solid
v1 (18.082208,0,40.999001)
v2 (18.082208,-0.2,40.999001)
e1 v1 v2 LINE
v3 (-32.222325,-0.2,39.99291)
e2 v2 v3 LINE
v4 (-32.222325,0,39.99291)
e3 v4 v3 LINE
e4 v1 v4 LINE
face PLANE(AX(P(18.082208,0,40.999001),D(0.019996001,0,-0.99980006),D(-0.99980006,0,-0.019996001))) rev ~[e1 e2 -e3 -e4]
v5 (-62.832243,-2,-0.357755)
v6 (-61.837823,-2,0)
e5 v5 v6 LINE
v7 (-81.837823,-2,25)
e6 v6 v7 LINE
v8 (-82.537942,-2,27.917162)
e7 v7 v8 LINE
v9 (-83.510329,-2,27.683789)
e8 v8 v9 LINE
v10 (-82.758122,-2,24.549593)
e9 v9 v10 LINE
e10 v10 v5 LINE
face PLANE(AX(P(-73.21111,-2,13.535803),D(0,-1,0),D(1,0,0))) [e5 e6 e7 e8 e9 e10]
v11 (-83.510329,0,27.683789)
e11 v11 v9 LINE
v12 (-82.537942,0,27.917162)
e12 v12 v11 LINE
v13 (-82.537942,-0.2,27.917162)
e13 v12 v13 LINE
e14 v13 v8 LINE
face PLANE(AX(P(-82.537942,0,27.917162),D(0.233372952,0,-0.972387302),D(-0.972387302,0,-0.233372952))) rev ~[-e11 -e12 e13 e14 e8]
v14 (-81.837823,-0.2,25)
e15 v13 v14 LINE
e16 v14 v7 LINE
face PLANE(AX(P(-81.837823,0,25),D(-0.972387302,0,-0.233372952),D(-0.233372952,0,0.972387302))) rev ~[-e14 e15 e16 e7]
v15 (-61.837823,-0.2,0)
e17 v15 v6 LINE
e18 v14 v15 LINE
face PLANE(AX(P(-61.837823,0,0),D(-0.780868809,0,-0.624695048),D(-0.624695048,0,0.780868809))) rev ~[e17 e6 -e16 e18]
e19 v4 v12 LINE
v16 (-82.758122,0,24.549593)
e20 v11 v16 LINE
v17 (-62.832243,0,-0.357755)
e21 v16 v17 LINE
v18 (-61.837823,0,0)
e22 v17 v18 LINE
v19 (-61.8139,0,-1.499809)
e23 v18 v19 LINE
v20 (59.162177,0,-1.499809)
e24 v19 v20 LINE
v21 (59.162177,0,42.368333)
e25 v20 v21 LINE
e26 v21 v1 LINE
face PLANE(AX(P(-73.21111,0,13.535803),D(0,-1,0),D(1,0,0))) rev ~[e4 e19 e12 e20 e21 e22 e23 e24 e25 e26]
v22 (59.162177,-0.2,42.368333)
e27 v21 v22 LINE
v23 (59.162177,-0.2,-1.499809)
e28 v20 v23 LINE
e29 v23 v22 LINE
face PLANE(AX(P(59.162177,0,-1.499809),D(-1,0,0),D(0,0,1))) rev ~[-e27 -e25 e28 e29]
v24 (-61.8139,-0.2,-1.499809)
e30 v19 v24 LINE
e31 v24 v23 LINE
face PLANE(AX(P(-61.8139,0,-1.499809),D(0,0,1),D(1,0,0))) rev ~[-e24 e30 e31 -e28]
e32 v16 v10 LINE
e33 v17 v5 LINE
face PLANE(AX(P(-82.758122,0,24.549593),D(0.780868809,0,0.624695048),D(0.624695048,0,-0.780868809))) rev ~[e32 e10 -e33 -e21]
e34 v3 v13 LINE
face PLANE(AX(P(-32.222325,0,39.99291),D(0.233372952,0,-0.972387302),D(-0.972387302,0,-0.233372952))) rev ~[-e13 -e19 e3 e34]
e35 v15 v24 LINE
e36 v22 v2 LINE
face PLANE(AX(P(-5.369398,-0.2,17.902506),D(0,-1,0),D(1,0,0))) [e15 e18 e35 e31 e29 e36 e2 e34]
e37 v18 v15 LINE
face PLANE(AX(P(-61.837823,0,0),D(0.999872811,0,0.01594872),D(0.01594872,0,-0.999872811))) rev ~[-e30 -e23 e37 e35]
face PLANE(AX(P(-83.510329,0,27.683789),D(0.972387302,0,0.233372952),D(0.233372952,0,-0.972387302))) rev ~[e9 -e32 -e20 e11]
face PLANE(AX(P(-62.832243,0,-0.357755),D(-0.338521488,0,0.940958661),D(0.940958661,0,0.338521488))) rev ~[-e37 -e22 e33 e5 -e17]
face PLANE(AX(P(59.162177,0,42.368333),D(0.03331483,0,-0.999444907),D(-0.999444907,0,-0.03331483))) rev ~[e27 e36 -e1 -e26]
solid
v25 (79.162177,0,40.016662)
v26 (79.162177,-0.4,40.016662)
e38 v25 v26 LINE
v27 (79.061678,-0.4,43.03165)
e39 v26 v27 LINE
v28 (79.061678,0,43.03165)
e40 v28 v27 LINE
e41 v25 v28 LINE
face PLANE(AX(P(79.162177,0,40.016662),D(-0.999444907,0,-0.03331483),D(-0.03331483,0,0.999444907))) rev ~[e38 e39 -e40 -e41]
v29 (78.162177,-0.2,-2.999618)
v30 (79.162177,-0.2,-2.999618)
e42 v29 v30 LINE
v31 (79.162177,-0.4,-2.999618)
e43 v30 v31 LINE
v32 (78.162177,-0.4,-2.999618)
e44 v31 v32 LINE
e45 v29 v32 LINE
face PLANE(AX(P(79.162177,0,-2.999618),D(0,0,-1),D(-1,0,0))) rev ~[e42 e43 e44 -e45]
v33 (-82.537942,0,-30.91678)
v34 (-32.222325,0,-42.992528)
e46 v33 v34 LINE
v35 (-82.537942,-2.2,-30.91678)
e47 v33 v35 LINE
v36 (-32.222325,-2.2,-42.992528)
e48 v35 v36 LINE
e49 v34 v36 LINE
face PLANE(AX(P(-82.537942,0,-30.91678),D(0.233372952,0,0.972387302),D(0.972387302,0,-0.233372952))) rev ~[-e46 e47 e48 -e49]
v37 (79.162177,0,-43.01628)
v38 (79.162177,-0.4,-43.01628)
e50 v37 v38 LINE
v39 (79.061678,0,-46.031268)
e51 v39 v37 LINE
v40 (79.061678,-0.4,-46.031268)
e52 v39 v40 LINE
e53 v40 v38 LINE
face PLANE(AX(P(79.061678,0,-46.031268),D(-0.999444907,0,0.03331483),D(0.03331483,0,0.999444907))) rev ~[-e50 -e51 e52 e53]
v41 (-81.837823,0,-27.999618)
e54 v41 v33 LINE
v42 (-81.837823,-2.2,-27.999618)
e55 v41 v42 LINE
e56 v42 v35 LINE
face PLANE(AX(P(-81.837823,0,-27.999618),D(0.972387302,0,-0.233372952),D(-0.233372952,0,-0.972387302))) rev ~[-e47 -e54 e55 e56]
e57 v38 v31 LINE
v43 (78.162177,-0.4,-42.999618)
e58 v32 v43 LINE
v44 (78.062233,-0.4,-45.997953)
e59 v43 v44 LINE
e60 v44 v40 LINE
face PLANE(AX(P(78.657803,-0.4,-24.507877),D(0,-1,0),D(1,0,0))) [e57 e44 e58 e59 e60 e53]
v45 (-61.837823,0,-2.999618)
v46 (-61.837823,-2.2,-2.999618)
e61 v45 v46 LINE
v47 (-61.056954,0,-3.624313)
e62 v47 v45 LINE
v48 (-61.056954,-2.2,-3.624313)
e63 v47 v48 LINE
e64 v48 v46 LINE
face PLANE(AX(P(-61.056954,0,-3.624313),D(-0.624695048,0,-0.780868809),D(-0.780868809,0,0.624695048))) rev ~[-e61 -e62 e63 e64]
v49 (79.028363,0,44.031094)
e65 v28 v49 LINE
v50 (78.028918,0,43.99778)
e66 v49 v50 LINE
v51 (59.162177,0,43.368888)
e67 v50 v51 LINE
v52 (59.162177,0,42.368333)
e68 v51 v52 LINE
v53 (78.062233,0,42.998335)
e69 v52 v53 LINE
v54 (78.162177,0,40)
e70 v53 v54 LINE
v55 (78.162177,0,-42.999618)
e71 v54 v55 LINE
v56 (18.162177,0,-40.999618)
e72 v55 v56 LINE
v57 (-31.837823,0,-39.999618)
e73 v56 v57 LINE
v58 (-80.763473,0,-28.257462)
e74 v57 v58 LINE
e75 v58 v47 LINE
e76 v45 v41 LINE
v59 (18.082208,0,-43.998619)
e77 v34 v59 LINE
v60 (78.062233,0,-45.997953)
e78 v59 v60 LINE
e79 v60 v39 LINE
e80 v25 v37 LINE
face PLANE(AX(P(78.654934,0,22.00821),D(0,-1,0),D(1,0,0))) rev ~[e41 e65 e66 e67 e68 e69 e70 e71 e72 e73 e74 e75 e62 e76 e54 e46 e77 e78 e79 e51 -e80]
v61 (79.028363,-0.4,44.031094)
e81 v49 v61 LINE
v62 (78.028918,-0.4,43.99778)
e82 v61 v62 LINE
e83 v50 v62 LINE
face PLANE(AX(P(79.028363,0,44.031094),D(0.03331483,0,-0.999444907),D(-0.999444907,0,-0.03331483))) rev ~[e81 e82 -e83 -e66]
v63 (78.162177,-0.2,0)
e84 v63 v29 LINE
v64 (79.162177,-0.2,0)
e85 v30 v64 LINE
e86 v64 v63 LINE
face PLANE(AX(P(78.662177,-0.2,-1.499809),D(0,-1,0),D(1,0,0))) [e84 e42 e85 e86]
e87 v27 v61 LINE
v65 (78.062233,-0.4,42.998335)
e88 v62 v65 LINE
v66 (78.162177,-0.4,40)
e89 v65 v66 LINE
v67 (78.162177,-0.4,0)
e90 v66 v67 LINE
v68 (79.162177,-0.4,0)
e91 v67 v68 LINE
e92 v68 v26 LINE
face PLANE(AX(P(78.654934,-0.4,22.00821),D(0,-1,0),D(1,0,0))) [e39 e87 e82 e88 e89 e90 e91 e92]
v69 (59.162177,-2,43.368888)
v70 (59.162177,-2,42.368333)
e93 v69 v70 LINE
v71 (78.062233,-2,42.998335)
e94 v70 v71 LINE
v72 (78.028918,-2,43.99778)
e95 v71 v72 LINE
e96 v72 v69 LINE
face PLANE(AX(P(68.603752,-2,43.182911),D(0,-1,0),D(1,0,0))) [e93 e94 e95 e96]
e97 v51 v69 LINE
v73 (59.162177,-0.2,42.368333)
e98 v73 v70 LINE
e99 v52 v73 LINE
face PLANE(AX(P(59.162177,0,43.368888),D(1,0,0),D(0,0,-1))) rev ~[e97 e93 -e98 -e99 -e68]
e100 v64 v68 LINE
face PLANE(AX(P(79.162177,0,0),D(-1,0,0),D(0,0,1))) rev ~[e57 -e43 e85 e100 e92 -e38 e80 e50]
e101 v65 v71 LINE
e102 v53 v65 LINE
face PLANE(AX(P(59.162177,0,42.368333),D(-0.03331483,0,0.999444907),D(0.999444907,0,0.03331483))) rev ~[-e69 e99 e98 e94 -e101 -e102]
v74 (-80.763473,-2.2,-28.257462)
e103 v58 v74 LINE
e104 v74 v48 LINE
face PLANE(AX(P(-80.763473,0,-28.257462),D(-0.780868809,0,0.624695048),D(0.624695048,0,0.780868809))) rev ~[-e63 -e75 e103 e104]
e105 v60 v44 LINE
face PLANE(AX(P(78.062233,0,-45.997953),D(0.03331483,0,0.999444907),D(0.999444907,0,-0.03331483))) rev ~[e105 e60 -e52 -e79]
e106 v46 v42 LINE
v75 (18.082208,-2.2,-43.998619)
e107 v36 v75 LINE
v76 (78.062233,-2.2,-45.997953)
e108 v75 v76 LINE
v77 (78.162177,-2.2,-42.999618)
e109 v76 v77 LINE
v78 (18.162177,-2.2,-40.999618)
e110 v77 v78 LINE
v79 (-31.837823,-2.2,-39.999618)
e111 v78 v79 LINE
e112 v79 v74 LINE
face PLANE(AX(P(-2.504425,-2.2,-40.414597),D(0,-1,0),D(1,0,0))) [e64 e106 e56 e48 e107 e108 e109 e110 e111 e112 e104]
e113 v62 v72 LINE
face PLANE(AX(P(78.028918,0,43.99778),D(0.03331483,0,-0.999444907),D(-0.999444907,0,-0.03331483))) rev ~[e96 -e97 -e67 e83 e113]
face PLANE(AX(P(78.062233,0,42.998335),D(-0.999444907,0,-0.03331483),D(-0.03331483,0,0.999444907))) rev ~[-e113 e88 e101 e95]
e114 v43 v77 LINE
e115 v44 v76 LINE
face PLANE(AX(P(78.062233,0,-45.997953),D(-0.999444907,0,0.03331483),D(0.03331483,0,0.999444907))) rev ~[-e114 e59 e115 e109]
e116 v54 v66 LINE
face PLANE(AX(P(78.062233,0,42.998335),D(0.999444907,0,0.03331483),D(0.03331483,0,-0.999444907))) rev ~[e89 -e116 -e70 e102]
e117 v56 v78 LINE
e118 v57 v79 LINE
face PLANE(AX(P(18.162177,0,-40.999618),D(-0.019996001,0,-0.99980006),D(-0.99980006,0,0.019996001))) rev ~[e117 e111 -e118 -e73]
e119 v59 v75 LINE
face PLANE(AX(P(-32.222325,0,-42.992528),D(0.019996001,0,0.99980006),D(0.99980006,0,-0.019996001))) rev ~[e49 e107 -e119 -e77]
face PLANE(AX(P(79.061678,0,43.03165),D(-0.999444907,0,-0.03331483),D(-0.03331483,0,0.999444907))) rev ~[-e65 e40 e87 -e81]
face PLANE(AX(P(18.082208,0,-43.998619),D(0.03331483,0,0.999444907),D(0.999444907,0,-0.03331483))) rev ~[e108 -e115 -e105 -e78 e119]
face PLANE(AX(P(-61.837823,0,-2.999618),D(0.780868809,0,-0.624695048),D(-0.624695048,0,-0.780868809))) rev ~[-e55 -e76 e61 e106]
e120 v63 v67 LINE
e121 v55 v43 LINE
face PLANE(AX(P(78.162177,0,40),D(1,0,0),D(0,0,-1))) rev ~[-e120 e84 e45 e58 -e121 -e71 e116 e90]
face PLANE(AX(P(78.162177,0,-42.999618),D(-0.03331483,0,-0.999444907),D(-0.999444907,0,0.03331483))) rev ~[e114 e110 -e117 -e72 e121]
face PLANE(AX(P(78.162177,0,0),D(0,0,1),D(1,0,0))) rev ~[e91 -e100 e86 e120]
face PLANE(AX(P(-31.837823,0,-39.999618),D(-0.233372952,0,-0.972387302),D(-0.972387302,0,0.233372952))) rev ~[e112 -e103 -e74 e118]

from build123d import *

# Parameters (mm, degrees)
F1_DEPTH = 0.2
F2_DEPTH = 2
F3_DEPTH = 2.2
F6_DEPTH = 0.4


# Not quite as in the source:
# - a feature of the source that left no trace in its solid (it failed there, or was rolled back) is left out
# - a feature names something its author has since deleted; it is built from what else it names


with BuildPart() as f1:
    # F0 (on Front) → F1 (new body)
    with BuildSketch(Plane.XZ):
        Polygon((-31.8378226987, 37), (-81.8378226987, 25), (-61.8378226987, 0), (-61.813899618, -1.4998092166), (59.1621773013, -1.4998092166), (59.1621773013, 39.3666666667), (18.1621773013, 38), align=None)
        Polygon((-82.5379415561, 27.9171619059), (-81.8378226987, 25), (-31.8378226987, 37), (18.1621773013, 38), (59.1621773013, 39.3666666667), (59.1621773013, 42.3683328706), (18.0822075051, 40.9990005441), (-32.2223249338, 39.9929098953), align=None)
    extrude(amount=F1_DEPTH)

    # F0 (on Front) → F2 (join)
    with BuildSketch(Plane.XZ):
        Polygon((-61.8378226987, 0), (-81.8378226987, 25), (-82.5379415561, 27.9171619059), (-83.5103288581, 27.6837889535), (-82.7581217792, 24.5495927912), (-62.8322434414, -0.357755131), align=None)
        Polygon((59.1621773013, 43.3688882719), (59.1621773013, 42.3683328706), (78.0622328106, 42.9983347209), (78.0289179803, 43.9977796279), align=None)
    extrude(amount=F2_DEPTH)



with BuildPart() as f1b:
    # F0 (on Front) → F1, piece 2 (new body)
    with BuildSketch(Plane.XZ):
        Polygon((79.1621773013, 0), (78.1621773013, 0), (78.1621773013, -1.4998092166), (78.1621773013, -2.9996184332), (79.1621773013, -2.9996184332), (79.1621773013, -1.4998092166), align=None)
    extrude(amount=F1_DEPTH)


with BuildPart() as f3:
    # F0 (on Front) → F3 (new body)
    with BuildSketch(Plane.XZ):
        Polygon((-80.7634729945, -28.2574623622), (-81.8378226987, -27.9996184332), (-82.5379415561, -30.9167803391), (-32.2223249338, -42.9925283285), (18.0822075051, -43.9986189773), (78.0622328106, -45.9979531541), (78.1621773013, -42.9996184332), (18.1621773013, -40.9996184332), (-31.8378226987, -39.9996184332), align=None)
        Polygon((-61.0569538893, -3.6243134808), (-61.8378226987, -2.9996184332), (-81.8378226987, -27.9996184332), (-80.7634729945, -28.2574623622), align=None)
    extrude(amount=F3_DEPTH)


with BuildPart() as f1_1:
    add(f1.part)

    add(f1b.part)  # F6 merges F1b

    add(f3.part)  # F6 merges F3
    # F0 (on Front) → F6 (join)
    with BuildSketch(Plane.XZ):
        Polygon((78.0289179803, 43.9977796279), (78.0622328106, 42.9983347209), (78.1621773013, 40), (78.1621773013, 0), (79.1621773013, 0), (79.1621773013, 40.0166620396), (79.0616777176, 43.0316495512), (79.0283628873, 44.0310944581), align=None)
        Polygon((78.1621773013, -42.9996184332), (78.0622328106, -45.9979531541), (79.0616777176, -46.0312679844), (79.1621773013, -43.0162804728), (79.1621773013, -2.9996184332), (78.1621773013, -2.9996184332), align=None)
    extrude(amount=F6_DEPTH)


solid = f1_1.part
